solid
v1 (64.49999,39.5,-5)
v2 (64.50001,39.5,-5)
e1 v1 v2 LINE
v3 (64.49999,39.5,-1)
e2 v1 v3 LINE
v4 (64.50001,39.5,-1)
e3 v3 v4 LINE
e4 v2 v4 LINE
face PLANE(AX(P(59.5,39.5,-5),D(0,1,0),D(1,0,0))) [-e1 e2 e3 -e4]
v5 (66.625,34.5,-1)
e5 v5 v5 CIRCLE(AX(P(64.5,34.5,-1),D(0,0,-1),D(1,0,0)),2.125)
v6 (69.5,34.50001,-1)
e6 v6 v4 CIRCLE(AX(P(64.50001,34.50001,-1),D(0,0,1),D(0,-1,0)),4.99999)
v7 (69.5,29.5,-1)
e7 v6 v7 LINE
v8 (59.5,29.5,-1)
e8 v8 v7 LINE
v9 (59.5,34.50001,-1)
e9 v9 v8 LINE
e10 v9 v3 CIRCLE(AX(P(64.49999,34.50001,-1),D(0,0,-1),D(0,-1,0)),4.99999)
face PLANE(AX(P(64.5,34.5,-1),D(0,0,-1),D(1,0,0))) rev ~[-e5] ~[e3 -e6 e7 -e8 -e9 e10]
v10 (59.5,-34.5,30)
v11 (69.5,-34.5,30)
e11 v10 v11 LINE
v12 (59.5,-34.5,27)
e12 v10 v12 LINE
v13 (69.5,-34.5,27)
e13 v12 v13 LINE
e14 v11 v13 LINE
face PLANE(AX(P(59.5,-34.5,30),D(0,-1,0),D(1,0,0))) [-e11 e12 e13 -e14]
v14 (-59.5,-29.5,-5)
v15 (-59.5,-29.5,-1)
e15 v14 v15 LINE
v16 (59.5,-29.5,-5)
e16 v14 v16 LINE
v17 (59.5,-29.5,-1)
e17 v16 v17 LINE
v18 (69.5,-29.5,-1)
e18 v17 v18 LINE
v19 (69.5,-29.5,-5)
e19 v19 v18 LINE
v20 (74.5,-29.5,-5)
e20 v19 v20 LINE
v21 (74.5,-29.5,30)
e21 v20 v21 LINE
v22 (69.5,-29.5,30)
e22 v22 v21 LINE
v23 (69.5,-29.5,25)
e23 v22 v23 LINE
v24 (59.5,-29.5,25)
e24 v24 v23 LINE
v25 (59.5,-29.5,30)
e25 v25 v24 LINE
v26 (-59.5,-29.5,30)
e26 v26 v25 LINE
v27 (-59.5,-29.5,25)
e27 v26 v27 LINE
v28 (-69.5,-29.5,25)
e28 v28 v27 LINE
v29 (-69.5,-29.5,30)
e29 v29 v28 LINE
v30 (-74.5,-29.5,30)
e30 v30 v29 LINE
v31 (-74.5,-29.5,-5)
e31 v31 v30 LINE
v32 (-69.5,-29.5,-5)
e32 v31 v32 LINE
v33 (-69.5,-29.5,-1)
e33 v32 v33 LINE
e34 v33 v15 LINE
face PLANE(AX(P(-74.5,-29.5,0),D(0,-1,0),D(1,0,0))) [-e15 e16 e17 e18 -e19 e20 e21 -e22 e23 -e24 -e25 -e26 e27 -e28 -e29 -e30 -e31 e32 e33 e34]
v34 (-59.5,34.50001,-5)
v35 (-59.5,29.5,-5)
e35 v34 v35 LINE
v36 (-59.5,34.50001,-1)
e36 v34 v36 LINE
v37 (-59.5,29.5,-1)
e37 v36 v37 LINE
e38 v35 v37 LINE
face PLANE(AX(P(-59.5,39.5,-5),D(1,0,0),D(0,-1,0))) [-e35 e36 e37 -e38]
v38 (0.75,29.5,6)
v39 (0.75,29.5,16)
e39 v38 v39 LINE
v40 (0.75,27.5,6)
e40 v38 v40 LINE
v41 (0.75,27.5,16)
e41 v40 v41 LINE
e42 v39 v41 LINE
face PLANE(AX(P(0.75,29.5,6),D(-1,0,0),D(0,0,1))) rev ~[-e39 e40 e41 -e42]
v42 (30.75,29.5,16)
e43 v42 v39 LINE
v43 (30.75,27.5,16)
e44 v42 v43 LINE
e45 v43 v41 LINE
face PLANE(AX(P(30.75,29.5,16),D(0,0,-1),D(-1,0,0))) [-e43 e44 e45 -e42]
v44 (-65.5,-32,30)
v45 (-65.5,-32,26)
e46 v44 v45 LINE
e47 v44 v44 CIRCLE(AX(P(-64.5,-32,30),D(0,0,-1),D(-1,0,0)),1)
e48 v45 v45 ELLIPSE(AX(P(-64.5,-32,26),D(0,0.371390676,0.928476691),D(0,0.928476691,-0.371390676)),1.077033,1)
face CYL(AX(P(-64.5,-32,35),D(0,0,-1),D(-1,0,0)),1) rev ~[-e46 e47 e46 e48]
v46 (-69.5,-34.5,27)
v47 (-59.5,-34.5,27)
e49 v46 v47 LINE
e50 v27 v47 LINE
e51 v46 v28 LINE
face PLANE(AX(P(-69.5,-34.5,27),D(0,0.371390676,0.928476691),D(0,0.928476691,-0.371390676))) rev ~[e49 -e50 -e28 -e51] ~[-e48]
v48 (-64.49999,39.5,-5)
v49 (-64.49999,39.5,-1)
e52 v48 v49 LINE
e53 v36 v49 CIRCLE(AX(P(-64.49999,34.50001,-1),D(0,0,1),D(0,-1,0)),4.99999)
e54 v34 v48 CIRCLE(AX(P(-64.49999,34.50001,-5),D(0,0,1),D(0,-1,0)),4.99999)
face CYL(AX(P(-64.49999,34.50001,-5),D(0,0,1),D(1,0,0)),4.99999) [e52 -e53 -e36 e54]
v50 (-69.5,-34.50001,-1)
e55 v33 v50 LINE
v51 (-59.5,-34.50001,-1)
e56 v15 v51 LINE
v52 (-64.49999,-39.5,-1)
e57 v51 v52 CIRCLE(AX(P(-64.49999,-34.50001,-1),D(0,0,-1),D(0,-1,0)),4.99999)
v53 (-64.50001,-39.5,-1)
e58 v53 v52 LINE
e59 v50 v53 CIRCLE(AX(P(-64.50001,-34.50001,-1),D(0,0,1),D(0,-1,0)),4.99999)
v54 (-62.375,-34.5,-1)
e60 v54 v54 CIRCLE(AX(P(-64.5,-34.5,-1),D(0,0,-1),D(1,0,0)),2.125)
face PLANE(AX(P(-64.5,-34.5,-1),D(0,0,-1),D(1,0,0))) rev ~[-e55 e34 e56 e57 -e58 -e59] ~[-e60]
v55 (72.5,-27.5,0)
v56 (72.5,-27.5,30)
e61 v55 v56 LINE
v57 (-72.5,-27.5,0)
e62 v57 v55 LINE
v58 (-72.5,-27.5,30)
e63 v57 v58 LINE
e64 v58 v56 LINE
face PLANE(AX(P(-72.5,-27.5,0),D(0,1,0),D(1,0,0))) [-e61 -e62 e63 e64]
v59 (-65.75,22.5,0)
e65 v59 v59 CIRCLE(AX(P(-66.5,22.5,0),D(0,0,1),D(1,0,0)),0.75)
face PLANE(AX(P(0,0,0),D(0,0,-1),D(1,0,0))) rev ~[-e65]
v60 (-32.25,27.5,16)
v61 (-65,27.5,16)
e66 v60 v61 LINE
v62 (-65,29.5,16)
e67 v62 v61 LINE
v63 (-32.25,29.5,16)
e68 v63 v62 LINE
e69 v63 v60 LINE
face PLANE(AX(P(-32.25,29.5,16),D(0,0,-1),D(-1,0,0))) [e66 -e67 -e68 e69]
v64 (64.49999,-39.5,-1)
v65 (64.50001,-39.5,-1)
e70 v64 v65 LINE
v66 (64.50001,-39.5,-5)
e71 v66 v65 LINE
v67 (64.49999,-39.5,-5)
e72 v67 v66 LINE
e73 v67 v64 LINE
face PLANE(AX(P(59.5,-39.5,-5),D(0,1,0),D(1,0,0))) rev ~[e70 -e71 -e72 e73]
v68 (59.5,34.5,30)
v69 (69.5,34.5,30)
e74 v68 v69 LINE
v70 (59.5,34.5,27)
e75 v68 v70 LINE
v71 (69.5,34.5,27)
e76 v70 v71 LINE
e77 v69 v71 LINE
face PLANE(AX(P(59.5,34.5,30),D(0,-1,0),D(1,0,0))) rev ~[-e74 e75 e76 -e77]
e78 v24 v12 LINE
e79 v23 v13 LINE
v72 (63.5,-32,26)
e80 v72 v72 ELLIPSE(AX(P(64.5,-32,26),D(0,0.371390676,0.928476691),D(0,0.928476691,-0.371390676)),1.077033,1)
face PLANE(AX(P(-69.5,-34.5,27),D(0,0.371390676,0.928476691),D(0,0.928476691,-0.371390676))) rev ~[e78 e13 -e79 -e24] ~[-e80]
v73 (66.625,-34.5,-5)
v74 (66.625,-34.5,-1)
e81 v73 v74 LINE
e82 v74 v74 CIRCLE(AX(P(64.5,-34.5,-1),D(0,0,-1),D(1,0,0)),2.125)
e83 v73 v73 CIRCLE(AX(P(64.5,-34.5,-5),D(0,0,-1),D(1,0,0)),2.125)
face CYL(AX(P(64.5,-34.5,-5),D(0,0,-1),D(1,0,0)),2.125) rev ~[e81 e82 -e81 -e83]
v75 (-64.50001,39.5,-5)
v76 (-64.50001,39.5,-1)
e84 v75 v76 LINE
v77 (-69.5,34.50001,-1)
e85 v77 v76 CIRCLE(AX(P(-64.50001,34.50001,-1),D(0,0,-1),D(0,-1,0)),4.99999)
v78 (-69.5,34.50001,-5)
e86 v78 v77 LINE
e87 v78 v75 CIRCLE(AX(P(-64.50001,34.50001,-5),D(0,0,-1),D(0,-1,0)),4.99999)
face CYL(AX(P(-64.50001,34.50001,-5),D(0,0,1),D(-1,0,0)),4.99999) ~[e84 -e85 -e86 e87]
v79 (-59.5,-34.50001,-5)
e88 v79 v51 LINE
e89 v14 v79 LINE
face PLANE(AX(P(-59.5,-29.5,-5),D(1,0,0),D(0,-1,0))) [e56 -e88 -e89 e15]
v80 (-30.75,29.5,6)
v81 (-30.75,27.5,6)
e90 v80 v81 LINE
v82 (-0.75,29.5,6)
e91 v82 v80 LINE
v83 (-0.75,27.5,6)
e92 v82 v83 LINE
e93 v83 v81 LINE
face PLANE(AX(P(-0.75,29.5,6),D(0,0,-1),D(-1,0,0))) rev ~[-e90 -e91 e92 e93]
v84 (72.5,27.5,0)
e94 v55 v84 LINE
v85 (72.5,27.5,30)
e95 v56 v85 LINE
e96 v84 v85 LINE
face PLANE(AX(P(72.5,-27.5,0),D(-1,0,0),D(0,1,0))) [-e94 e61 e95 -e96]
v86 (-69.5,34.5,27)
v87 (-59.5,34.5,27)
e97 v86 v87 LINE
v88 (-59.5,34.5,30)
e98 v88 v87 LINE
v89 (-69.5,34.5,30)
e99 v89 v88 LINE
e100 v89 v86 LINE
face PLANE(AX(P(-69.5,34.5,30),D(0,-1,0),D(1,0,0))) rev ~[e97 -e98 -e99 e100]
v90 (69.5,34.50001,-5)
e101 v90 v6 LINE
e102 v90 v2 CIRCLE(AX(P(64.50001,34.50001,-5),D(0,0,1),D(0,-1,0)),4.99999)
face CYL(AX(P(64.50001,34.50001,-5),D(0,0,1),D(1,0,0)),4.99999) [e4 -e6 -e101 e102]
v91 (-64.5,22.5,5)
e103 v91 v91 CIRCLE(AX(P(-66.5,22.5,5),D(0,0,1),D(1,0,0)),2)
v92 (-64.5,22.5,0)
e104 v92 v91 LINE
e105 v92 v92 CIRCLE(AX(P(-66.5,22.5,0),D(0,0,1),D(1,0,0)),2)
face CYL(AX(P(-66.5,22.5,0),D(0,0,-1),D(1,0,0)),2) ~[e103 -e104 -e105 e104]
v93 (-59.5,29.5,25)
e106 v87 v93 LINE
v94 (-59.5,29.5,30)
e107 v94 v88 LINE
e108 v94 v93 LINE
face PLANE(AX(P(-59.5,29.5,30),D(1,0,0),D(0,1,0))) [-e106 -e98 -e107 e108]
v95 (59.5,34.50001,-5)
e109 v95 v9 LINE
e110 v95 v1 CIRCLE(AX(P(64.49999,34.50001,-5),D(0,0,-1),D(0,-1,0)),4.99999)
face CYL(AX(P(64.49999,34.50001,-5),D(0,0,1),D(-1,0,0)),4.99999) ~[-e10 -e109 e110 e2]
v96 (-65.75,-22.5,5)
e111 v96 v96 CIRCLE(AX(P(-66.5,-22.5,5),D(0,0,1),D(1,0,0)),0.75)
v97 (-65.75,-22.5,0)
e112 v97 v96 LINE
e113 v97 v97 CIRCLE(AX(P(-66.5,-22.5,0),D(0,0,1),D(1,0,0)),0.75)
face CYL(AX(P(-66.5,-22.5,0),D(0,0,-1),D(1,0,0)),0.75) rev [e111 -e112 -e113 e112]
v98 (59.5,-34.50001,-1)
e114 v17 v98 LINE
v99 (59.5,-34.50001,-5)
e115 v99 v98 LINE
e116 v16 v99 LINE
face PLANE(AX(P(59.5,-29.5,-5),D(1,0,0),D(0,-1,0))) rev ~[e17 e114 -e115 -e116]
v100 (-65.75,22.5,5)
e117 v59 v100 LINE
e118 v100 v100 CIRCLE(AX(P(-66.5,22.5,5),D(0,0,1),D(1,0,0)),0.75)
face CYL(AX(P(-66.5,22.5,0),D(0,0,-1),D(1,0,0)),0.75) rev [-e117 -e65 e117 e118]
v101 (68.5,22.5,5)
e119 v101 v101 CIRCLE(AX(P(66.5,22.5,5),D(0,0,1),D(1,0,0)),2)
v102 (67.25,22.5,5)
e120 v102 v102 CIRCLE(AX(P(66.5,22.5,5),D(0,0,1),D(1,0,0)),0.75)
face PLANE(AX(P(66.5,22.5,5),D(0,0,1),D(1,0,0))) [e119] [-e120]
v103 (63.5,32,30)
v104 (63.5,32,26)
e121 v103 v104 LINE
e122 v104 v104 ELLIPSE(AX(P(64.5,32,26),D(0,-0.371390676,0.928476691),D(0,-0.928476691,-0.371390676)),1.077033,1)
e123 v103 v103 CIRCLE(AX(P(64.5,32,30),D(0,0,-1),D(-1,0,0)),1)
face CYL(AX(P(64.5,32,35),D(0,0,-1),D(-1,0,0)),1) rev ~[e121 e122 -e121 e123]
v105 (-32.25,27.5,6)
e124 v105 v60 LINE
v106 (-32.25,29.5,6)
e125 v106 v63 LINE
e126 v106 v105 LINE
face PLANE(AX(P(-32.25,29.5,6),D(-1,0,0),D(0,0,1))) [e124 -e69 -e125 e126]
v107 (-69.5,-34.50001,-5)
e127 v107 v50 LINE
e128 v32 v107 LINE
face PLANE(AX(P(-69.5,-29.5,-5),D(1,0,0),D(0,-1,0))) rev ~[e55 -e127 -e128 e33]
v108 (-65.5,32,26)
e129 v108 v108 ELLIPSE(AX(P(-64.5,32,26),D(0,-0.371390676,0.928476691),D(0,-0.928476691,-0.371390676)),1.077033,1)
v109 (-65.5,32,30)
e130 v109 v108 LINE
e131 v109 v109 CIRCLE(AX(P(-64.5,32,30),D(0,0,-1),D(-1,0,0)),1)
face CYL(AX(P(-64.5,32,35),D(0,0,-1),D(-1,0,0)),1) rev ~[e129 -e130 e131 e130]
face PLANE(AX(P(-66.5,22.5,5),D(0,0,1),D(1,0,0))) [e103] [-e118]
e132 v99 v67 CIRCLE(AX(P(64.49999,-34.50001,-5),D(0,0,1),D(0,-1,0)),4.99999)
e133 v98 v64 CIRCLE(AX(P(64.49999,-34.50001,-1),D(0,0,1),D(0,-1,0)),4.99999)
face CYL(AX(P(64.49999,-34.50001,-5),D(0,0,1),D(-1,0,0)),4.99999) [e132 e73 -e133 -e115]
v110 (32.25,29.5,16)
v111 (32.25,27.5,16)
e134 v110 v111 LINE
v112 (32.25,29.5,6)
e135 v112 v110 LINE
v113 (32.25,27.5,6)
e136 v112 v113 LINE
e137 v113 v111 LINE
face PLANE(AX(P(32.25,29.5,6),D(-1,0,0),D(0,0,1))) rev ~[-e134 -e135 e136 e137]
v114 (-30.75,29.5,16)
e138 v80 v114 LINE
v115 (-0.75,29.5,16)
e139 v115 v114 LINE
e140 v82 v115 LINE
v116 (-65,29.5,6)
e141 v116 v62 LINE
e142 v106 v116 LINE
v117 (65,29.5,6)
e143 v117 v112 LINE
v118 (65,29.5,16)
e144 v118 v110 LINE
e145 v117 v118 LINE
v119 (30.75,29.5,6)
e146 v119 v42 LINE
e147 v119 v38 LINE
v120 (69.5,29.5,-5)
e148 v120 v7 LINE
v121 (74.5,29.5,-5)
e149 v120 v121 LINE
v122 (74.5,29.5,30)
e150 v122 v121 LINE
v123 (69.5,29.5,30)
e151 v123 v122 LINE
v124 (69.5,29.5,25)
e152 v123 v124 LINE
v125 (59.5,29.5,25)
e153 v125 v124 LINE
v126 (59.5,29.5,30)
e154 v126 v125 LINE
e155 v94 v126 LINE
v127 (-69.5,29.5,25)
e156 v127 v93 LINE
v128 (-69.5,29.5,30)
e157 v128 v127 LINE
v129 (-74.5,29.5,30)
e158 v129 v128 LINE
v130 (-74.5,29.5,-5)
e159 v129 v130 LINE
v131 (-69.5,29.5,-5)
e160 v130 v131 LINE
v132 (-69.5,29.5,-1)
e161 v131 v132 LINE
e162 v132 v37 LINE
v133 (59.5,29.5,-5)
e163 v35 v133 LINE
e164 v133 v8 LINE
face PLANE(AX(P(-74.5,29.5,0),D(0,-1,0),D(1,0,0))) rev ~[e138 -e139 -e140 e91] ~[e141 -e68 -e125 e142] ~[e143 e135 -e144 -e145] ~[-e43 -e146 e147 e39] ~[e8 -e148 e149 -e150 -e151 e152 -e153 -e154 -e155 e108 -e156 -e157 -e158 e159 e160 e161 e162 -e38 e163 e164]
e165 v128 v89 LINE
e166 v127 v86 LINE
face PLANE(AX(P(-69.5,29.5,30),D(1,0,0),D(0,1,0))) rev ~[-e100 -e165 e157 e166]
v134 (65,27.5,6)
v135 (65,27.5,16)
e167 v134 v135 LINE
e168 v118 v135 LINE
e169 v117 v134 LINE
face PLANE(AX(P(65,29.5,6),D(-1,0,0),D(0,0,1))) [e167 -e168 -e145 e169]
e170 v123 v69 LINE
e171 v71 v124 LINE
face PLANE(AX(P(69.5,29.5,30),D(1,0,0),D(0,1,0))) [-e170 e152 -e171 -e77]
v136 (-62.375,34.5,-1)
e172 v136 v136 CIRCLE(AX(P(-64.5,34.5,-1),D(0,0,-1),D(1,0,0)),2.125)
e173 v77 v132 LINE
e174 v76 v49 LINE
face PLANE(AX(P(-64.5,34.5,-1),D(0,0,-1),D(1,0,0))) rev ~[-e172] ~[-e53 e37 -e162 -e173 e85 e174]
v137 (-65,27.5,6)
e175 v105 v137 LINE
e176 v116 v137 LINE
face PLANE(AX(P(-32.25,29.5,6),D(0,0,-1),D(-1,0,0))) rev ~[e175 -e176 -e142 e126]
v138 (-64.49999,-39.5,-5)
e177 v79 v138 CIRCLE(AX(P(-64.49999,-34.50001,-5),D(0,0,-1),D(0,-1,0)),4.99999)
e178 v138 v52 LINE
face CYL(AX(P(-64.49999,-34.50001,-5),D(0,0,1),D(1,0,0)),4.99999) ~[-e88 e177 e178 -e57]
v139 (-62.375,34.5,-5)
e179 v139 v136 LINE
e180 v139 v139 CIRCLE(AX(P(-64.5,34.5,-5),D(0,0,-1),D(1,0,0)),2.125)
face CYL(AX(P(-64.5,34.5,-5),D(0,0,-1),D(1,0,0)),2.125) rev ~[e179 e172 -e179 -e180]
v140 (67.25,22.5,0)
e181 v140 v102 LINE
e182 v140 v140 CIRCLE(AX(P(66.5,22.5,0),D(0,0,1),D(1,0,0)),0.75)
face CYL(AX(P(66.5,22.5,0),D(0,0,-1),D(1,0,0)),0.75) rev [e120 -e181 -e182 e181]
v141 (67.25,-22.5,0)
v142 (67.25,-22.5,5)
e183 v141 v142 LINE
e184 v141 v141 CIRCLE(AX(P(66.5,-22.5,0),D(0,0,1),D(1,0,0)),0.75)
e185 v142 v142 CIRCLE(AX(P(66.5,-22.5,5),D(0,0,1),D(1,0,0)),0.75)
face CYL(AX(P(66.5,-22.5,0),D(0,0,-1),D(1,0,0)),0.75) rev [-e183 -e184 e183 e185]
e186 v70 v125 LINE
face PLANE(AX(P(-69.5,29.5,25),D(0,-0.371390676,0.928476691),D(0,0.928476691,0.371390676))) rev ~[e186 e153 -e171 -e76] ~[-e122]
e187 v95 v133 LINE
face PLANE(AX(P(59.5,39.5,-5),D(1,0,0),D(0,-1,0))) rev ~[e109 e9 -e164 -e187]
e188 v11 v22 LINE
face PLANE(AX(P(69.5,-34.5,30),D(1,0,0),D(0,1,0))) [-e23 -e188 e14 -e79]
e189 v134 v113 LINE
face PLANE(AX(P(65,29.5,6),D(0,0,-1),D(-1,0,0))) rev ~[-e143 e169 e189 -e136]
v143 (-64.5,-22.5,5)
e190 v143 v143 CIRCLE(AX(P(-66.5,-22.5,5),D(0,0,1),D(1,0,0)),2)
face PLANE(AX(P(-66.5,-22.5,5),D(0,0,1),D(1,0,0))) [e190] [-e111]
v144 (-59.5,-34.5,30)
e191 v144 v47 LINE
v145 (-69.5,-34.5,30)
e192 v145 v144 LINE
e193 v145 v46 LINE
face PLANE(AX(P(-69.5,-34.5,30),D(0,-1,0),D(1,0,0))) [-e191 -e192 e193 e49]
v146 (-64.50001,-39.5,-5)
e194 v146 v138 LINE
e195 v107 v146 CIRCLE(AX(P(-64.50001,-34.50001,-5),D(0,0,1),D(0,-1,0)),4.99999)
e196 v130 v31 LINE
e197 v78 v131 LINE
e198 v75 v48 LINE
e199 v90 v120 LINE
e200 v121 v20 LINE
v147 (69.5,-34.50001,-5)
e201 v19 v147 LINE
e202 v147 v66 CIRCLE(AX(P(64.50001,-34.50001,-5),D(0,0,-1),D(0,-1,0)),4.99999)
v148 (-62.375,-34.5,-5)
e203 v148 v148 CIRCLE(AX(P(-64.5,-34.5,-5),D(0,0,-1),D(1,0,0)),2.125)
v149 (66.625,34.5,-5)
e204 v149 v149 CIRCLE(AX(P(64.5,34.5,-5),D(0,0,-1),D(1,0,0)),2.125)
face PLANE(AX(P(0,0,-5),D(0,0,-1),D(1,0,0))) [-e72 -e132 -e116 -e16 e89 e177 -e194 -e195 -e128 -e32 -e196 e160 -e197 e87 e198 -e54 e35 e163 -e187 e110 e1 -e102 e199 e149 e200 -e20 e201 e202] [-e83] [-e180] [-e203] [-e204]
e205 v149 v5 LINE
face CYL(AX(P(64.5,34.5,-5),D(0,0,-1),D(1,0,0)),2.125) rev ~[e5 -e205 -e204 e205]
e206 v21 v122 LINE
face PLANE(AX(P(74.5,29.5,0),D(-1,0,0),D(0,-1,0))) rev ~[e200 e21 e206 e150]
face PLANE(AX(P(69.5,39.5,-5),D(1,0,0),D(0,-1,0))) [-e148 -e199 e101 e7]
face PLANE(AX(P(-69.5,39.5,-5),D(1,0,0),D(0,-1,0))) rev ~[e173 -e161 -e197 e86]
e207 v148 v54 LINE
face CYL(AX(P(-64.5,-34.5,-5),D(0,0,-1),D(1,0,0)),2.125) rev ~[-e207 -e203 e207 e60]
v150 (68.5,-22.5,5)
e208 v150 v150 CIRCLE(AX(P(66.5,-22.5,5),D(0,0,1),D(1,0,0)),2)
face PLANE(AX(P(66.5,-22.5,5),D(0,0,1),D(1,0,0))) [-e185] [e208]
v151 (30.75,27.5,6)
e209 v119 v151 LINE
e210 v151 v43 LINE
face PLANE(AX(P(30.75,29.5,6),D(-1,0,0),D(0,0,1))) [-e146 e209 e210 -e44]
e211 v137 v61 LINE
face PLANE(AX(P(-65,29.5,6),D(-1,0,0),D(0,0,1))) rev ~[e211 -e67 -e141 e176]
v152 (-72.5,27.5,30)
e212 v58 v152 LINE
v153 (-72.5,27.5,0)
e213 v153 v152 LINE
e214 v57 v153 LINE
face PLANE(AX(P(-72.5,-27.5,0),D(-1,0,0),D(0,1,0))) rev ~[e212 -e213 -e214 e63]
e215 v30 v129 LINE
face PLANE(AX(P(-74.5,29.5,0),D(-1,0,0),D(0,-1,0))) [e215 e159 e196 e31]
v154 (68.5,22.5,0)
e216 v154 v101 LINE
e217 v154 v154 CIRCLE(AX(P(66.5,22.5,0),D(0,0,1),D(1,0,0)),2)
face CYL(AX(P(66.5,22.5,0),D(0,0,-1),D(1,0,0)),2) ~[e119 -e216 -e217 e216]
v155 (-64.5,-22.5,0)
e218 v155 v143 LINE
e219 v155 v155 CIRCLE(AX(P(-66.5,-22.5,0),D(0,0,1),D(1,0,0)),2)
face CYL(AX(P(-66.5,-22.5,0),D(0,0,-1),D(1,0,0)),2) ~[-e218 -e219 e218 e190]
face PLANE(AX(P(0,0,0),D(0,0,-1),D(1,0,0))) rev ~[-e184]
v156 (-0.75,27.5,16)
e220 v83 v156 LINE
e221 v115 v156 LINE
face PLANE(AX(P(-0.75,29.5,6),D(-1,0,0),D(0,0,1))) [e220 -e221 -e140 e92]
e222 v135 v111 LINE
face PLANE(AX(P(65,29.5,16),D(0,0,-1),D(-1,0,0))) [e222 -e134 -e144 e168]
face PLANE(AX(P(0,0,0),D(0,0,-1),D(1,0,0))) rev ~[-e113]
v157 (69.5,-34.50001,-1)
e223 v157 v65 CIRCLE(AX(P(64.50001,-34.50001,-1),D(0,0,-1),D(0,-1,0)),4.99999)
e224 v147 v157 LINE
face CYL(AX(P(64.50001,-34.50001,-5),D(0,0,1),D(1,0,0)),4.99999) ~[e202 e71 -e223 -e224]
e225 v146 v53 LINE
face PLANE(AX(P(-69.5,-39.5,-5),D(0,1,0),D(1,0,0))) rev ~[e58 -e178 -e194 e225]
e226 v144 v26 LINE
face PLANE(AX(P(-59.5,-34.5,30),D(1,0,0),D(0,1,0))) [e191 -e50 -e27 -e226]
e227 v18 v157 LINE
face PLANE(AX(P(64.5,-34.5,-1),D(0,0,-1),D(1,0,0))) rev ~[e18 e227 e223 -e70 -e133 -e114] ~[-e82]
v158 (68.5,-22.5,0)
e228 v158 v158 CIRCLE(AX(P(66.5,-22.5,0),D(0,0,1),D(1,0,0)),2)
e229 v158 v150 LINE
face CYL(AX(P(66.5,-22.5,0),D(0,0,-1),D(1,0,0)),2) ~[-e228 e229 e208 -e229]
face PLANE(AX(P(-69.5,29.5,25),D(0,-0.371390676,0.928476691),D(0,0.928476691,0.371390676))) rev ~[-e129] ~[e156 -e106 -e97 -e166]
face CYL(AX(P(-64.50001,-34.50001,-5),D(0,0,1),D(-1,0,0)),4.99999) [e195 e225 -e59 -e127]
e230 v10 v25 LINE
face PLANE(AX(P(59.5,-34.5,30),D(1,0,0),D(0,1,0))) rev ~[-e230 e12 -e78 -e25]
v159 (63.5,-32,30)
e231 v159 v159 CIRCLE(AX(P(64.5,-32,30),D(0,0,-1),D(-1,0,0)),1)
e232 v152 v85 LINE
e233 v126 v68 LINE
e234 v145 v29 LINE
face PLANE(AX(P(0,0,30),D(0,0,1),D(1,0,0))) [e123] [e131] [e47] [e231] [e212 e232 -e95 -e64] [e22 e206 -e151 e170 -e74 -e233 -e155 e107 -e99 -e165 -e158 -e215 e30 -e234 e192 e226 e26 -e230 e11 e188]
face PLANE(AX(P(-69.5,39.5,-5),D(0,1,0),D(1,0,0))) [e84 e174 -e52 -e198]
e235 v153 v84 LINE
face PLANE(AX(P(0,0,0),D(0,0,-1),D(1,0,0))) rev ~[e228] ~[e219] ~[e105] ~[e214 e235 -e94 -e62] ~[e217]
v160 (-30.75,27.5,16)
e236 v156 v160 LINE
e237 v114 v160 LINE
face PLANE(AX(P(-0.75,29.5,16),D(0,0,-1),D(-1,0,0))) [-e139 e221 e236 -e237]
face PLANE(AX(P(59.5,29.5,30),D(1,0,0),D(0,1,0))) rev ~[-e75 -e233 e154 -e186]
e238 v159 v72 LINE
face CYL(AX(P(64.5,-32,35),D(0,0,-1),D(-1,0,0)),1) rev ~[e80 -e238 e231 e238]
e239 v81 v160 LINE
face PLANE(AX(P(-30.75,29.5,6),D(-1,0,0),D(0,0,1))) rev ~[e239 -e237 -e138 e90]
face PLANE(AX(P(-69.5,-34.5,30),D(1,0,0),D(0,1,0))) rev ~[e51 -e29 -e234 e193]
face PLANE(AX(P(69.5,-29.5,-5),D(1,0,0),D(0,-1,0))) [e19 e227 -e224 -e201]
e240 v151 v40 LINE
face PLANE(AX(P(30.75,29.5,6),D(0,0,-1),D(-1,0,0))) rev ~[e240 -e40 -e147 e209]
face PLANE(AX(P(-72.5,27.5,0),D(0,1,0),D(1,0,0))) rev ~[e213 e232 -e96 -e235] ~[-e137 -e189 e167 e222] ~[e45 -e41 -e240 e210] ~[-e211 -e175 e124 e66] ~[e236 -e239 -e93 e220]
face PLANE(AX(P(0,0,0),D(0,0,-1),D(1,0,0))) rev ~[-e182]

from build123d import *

# Parameters (mm, degrees)
F0_W      = 149
F0_H      = 59
F0_W_2    = 145
F0_H_2    = 55
F1_DEPTH  = 30
F2_W      = 149
F2_H      = 59
F2_W_2    = 145
F2_H_2    = 55
F3_DEPTH  = 5
F4_R      = 2
F4_R_2    = 0.75
F5_DEPTH  = 5
F6_W      = 10
F6_H      = 10
F6_R      = 2.125
F7_DEPTH  = 4
F8_R      = 4.99999
F9_W      = 32.75
F9_H      = 10
F9_W_2    = 30
F10_DEPTH = 2
F11_W     = 10
F11_H     = 5
F12_DEPTH = 5
F14_DEPTH = 144.001
F16_D     = 2
F16_DEPTH = 5
F16_TIP   = 0.600860619


# Not quite as in the source:
# - a fillet or chamfer is up to 0.001 mm smaller than in the source, because OpenCascade refuses the exact size


with BuildPart() as f1:
    # F0 (on Top) → F1 (new body)
    with BuildSketch(Plane.XY):
        Rectangle(F0_W, F0_H)
        Rectangle(F0_W_2, F0_H_2, mode=Mode.SUBTRACT)
    extrude(amount=F1_DEPTH)

    # F2 (on face) → F3 (join)
    with BuildSketch(Plane(origin=(0, 0, 0), x_dir=(1, 0, 0), z_dir=(0, 0, -1))):
        Rectangle(F2_W, F2_H)
        Rectangle(F2_W_2, F2_H_2, mode=Mode.SUBTRACT)
        Rectangle(F2_W_2, F2_H_2)
    extrude(amount=F3_DEPTH)

    # F4 (on face) → F5 (join)
    with BuildSketch(Plane.XY):
        with Locations((-66.5, 22.5)):
            Circle(F4_R)
        with Locations((-66.5, 22.5)):
            Circle(F4_R_2, mode=Mode.SUBTRACT)
        with Locations((-66.5, -22.5)):
            Circle(F4_R)
        with Locations((-66.5, -22.5)):
            Circle(F4_R_2, mode=Mode.SUBTRACT)
        with Locations((66.5, -22.5)):
            Circle(F4_R)
        with Locations((66.5, -22.5)):
            Circle(F4_R_2, mode=Mode.SUBTRACT)
        with Locations((66.5, 22.5)):
            Circle(F4_R)
        with Locations((66.5, 22.5)):
            Circle(F4_R_2, mode=Mode.SUBTRACT)
    extrude(amount=F5_DEPTH)

    # F6 (on face) → F7 (join)
    with BuildSketch(Plane(origin=(0, 0, -5), x_dir=(1, 0, 0), z_dir=(0, 0, -1))):
        with Locations((-64.5, 34.5)):
            Rectangle(F6_W, F6_H)
        with Locations((-64.5, 34.5)):
            Circle(F6_R, mode=Mode.SUBTRACT)
        with Locations((64.5, 34.5)):
            Rectangle(F6_W, F6_H)
        with Locations((64.5, 34.5)):
            Circle(F6_R, mode=Mode.SUBTRACT)
        with Locations((-64.5, -34.5)):
            Rectangle(F6_W, F6_H)
        with Locations((-64.5, -34.5)):
            Circle(F6_R, mode=Mode.SUBTRACT)
        with Locations((64.5, -34.5)):
            Rectangle(F6_W, F6_H)
        with Locations((64.5, -34.5)):
            Circle(F6_R, mode=Mode.SUBTRACT)
    extrude(amount=-F7_DEPTH)

    # F8 (radius 5 in the source; OpenCascade refuses exactly that, so slightly less here)
    f8_edges = [f1.edges().sort_by_distance(p)[0] for p in [
        (-69.5, -39.5, -3),
        (-59.5, -39.5, -3),
        (69.5, -39.5, -3),
        (59.5, -39.5, -3),
        (69.5, 39.5, -3),
        (59.5, 39.5, -3),
        (-59.5, 39.5, -3),
        (-69.5, 39.5, -3),
    ]]
    fillet(f8_edges, radius=F8_R)

    # F9 (on face) → F10 (cut, through all)
    with BuildSketch(Plane(origin=(0, 29.5, 0), x_dir=(-1, 0, 0), z_dir=(0, 1, 0))):
        with Locations((-48.625, 11)):
            Rectangle(F9_W, F9_H)
        with Locations((-15.75, 11)):
            Rectangle(F9_W_2, F9_H)
        with Locations((15.75, 11)):
            Rectangle(F9_W_2, F9_H)
        with Locations((48.625, 11)):
            Rectangle(F9_W, F9_H)
    extrude(amount=-F10_DEPTH, mode=Mode.SUBTRACT)

    # F11 (on face) → F12 (join)
    with BuildSketch(Plane.XY.offset(30)):
        with Locations((64.5, 32)):
            Rectangle(F11_W, F11_H)
        with Locations((-64.5, 32)):
            Rectangle(F11_W, F11_H)
        with Locations((-64.5, -32)):
            Rectangle(F11_W, F11_H)
        with Locations((64.5, -32)):
            Rectangle(F11_W, F11_H)
    extrude(amount=-F12_DEPTH)

    # F13 (on face) → F14 (cut, through all)
    with BuildSketch(Plane(origin=(-69.5, 0, 0), x_dir=(0, -1, 0), z_dir=(-1, 0, 0))):
        Polygon((34.5, 27), (29.5, 25), (34.5, 25), align=None)
        Polygon((-29.5, 25), (-34.5, 27), (-34.5, 25), align=None)
    extrude(amount=-F14_DEPTH, mode=Mode.SUBTRACT)

    # F16
    with Locations(Plane.XY.offset(30)):
        with Locations((64.5, 32), (64.5, -32), (-64.5, -32), (-64.5, 32)):
            Hole(F16_D / 2, depth=F16_DEPTH)
            with Locations((0, 0, -(F16_DEPTH + F16_TIP / 2))):  # 118° drill point
                Cone(0, F16_D / 2, F16_TIP, mode=Mode.SUBTRACT)


solid = f1.part
